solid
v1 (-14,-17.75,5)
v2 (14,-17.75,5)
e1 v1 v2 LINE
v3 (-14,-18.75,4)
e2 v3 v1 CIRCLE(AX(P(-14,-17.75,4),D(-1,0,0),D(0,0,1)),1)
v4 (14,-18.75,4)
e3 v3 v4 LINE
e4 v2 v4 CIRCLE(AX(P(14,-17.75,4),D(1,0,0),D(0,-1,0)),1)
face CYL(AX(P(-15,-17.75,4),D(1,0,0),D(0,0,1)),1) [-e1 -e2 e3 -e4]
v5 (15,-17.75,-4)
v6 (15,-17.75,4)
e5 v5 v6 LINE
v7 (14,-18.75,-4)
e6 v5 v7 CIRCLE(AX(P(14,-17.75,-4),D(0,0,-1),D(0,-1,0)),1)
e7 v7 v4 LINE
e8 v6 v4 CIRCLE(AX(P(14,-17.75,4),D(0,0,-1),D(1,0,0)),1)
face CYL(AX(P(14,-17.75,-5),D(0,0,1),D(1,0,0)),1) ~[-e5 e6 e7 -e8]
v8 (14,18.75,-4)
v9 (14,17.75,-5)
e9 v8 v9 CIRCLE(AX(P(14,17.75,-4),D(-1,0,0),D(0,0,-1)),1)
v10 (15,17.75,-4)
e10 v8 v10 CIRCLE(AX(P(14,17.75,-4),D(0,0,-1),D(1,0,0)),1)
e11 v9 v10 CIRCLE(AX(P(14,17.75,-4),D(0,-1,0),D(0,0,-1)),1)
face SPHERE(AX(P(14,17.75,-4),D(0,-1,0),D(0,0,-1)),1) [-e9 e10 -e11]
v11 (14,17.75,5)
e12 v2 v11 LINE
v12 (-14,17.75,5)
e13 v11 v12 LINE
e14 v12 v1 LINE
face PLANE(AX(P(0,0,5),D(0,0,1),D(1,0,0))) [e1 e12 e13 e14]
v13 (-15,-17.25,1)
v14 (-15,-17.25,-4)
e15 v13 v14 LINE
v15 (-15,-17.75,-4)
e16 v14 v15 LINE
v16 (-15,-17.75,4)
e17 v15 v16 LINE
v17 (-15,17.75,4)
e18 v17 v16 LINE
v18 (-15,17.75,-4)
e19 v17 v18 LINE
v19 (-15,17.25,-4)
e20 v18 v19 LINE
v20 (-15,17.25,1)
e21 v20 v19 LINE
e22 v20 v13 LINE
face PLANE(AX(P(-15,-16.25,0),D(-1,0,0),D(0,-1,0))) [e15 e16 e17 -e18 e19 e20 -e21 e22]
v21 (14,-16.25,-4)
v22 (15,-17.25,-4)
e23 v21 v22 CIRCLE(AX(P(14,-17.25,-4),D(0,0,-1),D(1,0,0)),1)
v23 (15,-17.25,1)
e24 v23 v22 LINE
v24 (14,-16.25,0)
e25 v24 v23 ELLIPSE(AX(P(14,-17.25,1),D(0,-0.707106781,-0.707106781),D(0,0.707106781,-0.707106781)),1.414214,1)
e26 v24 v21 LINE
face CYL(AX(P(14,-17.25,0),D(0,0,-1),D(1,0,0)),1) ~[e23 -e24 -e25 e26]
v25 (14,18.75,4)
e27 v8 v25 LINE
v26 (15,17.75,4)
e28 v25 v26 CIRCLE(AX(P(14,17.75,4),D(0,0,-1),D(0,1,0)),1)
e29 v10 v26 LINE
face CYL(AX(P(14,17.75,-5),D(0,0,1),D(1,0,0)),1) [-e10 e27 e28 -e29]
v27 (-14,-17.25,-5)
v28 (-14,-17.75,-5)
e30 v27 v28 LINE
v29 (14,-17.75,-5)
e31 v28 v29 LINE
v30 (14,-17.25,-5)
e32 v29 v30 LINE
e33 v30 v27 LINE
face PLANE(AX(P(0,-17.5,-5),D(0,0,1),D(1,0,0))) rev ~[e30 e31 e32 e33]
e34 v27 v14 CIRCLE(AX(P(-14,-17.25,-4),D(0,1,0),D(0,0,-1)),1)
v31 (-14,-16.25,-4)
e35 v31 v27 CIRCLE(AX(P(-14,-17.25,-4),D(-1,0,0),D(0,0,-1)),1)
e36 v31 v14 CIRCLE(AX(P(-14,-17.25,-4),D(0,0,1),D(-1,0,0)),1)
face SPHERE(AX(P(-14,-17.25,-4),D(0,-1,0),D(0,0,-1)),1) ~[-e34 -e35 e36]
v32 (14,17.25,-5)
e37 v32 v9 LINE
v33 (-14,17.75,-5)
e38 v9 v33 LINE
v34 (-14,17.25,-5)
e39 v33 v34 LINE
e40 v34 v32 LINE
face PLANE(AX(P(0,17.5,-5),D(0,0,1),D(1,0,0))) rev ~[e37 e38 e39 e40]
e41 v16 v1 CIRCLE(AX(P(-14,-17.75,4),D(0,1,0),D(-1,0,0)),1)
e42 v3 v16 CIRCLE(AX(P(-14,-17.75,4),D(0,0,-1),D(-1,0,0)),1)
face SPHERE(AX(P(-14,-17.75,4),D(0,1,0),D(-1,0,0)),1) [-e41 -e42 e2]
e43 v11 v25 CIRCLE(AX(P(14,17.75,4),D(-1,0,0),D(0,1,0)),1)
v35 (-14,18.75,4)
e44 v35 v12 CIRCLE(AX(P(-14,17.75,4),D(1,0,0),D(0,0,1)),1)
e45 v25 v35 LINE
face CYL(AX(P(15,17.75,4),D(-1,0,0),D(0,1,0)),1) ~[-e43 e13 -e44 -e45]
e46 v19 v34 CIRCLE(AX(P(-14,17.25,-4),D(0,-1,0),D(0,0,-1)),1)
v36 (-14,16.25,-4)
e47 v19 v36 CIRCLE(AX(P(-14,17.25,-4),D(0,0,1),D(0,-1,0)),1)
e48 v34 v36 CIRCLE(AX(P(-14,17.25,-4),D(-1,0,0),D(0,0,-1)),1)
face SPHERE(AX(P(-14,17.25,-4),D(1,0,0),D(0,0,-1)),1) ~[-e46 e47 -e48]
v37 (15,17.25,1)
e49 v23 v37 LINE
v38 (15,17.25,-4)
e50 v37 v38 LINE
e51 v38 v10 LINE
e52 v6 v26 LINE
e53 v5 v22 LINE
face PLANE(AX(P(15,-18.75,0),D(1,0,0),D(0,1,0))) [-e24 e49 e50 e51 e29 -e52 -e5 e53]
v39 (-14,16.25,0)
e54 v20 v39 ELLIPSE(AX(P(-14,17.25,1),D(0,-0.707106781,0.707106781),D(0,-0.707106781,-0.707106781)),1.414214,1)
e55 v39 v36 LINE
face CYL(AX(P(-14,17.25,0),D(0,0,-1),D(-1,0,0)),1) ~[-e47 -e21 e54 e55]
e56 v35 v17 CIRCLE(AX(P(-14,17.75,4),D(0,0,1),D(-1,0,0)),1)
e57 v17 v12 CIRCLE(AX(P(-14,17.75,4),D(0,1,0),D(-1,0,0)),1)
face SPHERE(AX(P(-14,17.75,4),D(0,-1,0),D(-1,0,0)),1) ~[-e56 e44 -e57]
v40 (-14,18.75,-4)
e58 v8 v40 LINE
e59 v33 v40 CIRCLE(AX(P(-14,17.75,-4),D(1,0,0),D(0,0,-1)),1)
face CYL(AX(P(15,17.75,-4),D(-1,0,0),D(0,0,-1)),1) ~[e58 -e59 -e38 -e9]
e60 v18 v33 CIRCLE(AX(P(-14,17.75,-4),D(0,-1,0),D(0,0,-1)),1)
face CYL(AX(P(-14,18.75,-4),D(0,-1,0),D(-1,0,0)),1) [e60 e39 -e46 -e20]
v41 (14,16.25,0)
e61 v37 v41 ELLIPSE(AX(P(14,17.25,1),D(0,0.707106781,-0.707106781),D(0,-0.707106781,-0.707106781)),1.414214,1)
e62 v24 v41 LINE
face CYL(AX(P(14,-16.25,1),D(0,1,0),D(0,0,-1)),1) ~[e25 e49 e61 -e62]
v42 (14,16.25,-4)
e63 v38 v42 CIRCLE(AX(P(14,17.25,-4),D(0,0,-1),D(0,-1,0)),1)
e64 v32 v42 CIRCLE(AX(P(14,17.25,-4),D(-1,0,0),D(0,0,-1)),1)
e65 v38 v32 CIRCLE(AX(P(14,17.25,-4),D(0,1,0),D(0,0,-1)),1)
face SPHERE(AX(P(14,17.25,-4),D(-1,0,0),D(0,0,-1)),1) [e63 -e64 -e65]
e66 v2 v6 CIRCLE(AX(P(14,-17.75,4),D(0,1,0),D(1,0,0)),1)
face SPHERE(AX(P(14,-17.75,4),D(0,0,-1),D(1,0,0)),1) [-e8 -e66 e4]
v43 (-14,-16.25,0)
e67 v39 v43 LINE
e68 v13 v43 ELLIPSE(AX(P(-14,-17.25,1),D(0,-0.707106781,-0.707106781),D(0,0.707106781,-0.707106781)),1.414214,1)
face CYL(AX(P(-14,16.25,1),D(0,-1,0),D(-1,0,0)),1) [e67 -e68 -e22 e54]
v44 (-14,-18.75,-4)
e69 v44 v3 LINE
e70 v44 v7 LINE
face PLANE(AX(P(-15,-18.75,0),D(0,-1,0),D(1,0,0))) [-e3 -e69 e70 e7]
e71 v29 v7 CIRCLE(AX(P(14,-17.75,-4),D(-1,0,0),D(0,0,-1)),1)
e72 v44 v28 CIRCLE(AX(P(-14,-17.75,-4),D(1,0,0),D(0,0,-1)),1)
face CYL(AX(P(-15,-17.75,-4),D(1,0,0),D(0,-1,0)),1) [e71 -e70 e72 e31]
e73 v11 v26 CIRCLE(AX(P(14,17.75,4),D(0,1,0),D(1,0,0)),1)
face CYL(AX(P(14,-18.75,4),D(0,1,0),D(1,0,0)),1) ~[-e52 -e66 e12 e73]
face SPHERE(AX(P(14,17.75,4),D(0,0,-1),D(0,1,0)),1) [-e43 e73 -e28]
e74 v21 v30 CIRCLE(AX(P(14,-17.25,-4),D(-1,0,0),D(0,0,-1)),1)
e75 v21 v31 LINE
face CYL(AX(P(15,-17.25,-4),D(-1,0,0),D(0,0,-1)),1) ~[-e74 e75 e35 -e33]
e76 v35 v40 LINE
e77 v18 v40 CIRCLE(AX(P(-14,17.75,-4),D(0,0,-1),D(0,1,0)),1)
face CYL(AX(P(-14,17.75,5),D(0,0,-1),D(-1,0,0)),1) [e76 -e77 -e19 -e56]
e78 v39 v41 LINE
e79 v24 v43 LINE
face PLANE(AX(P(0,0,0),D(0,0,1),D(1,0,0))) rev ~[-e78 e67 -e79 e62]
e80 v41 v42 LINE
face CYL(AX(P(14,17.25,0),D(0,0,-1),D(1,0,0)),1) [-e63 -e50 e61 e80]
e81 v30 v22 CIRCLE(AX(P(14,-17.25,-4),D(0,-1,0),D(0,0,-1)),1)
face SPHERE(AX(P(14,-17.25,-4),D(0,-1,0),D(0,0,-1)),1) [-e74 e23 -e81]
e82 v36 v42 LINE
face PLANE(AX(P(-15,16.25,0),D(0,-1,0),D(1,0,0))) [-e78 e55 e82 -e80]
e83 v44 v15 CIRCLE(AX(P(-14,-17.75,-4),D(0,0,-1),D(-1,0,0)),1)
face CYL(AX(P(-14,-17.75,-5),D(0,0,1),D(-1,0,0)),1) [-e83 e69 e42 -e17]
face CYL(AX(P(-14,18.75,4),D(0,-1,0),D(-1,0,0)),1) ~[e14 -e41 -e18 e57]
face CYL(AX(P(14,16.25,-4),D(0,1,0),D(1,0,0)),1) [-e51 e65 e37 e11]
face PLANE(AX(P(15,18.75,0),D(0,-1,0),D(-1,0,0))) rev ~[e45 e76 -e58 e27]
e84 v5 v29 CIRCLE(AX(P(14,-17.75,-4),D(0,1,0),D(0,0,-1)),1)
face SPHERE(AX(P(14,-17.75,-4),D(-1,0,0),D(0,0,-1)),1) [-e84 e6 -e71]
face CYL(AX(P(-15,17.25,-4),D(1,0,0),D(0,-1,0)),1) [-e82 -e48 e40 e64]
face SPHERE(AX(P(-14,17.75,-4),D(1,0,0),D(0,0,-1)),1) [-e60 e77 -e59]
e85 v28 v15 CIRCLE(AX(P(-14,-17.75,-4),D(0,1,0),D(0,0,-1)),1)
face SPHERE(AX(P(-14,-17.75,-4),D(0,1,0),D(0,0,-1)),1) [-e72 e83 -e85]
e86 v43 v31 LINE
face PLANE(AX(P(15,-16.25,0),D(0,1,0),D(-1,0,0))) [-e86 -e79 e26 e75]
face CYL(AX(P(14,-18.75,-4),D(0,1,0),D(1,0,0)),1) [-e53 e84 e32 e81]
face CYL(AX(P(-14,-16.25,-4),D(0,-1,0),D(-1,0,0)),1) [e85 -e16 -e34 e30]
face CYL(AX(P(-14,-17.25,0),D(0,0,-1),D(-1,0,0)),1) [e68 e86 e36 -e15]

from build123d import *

# Parameters (mm, degrees)
F0_W     = 25
F0_H     = 32.5
F0_W_2   = 2.5
F1_DEPTH = 5
F2_DEPTH = 5
F3_R     = 1


with BuildPart() as f1:
    # F0 (on Top) → F1 (new body)
    with BuildSketch(Plane.XY):
        Rectangle(F0_W, F0_H)
        Polygon((-15, 16.25), (-12.5, 16.25), (12.5, 16.25), (15, 16.25), (15, 18.75), (-15, 18.75), align=None)
        with Locations((-13.75, 0)):
            Rectangle(F0_W_2, F0_H)
        Polygon((12.5, -16.25), (-12.5, -16.25), (-15, -16.25), (-15, -18.75), (15, -18.75), (15, -16.25), align=None)
        with Locations((13.75, 0)):
            Rectangle(F0_W_2, F0_H)
    extrude(amount=F1_DEPTH)

    # F0 (on Top) → F2 (join)
    with BuildSketch(Plane.XY):
        Polygon((12.5, -16.25), (-12.5, -16.25), (-15, -16.25), (-15, -18.75), (15, -18.75), (15, -16.25), align=None)
        Polygon((-15, 16.25), (-12.5, 16.25), (12.5, 16.25), (15, 16.25), (15, 18.75), (-15, 18.75), align=None)
    extrude(amount=-F2_DEPTH)

    # F3
    f3_edges = [f1.edges().sort_by_distance(p)[0] for p in [
        (0, 16.25, -5),
        (15, 17.5, -5),
        (0, 18.75, -5),
        (-15, 17.5, -5),
        (-15, -17.5, -5),
        (0, -18.75, -5),
        (15, -17.5, -5),
        (0, -16.25, -5),
        (-15, 0, 5),
        (-15, -18.75, 0),
        (-15, -16.25, -2.5),
        (-15, 0, 0),
        (-15, 16.25, -2.5),
        (-15, 18.75, 0),
        (15, 18.75, 0),
        (0, 18.75, 5),
        (15, -18.75, 0),
        (15, 0, 5),
        (15, 16.25, -2.5),
        (15, 0, 0),
        (15, -16.25, -2.5),
        (0, -18.75, 5),
    ]]
    fillet(f3_edges, radius=F3_R)


solid = f1.part
